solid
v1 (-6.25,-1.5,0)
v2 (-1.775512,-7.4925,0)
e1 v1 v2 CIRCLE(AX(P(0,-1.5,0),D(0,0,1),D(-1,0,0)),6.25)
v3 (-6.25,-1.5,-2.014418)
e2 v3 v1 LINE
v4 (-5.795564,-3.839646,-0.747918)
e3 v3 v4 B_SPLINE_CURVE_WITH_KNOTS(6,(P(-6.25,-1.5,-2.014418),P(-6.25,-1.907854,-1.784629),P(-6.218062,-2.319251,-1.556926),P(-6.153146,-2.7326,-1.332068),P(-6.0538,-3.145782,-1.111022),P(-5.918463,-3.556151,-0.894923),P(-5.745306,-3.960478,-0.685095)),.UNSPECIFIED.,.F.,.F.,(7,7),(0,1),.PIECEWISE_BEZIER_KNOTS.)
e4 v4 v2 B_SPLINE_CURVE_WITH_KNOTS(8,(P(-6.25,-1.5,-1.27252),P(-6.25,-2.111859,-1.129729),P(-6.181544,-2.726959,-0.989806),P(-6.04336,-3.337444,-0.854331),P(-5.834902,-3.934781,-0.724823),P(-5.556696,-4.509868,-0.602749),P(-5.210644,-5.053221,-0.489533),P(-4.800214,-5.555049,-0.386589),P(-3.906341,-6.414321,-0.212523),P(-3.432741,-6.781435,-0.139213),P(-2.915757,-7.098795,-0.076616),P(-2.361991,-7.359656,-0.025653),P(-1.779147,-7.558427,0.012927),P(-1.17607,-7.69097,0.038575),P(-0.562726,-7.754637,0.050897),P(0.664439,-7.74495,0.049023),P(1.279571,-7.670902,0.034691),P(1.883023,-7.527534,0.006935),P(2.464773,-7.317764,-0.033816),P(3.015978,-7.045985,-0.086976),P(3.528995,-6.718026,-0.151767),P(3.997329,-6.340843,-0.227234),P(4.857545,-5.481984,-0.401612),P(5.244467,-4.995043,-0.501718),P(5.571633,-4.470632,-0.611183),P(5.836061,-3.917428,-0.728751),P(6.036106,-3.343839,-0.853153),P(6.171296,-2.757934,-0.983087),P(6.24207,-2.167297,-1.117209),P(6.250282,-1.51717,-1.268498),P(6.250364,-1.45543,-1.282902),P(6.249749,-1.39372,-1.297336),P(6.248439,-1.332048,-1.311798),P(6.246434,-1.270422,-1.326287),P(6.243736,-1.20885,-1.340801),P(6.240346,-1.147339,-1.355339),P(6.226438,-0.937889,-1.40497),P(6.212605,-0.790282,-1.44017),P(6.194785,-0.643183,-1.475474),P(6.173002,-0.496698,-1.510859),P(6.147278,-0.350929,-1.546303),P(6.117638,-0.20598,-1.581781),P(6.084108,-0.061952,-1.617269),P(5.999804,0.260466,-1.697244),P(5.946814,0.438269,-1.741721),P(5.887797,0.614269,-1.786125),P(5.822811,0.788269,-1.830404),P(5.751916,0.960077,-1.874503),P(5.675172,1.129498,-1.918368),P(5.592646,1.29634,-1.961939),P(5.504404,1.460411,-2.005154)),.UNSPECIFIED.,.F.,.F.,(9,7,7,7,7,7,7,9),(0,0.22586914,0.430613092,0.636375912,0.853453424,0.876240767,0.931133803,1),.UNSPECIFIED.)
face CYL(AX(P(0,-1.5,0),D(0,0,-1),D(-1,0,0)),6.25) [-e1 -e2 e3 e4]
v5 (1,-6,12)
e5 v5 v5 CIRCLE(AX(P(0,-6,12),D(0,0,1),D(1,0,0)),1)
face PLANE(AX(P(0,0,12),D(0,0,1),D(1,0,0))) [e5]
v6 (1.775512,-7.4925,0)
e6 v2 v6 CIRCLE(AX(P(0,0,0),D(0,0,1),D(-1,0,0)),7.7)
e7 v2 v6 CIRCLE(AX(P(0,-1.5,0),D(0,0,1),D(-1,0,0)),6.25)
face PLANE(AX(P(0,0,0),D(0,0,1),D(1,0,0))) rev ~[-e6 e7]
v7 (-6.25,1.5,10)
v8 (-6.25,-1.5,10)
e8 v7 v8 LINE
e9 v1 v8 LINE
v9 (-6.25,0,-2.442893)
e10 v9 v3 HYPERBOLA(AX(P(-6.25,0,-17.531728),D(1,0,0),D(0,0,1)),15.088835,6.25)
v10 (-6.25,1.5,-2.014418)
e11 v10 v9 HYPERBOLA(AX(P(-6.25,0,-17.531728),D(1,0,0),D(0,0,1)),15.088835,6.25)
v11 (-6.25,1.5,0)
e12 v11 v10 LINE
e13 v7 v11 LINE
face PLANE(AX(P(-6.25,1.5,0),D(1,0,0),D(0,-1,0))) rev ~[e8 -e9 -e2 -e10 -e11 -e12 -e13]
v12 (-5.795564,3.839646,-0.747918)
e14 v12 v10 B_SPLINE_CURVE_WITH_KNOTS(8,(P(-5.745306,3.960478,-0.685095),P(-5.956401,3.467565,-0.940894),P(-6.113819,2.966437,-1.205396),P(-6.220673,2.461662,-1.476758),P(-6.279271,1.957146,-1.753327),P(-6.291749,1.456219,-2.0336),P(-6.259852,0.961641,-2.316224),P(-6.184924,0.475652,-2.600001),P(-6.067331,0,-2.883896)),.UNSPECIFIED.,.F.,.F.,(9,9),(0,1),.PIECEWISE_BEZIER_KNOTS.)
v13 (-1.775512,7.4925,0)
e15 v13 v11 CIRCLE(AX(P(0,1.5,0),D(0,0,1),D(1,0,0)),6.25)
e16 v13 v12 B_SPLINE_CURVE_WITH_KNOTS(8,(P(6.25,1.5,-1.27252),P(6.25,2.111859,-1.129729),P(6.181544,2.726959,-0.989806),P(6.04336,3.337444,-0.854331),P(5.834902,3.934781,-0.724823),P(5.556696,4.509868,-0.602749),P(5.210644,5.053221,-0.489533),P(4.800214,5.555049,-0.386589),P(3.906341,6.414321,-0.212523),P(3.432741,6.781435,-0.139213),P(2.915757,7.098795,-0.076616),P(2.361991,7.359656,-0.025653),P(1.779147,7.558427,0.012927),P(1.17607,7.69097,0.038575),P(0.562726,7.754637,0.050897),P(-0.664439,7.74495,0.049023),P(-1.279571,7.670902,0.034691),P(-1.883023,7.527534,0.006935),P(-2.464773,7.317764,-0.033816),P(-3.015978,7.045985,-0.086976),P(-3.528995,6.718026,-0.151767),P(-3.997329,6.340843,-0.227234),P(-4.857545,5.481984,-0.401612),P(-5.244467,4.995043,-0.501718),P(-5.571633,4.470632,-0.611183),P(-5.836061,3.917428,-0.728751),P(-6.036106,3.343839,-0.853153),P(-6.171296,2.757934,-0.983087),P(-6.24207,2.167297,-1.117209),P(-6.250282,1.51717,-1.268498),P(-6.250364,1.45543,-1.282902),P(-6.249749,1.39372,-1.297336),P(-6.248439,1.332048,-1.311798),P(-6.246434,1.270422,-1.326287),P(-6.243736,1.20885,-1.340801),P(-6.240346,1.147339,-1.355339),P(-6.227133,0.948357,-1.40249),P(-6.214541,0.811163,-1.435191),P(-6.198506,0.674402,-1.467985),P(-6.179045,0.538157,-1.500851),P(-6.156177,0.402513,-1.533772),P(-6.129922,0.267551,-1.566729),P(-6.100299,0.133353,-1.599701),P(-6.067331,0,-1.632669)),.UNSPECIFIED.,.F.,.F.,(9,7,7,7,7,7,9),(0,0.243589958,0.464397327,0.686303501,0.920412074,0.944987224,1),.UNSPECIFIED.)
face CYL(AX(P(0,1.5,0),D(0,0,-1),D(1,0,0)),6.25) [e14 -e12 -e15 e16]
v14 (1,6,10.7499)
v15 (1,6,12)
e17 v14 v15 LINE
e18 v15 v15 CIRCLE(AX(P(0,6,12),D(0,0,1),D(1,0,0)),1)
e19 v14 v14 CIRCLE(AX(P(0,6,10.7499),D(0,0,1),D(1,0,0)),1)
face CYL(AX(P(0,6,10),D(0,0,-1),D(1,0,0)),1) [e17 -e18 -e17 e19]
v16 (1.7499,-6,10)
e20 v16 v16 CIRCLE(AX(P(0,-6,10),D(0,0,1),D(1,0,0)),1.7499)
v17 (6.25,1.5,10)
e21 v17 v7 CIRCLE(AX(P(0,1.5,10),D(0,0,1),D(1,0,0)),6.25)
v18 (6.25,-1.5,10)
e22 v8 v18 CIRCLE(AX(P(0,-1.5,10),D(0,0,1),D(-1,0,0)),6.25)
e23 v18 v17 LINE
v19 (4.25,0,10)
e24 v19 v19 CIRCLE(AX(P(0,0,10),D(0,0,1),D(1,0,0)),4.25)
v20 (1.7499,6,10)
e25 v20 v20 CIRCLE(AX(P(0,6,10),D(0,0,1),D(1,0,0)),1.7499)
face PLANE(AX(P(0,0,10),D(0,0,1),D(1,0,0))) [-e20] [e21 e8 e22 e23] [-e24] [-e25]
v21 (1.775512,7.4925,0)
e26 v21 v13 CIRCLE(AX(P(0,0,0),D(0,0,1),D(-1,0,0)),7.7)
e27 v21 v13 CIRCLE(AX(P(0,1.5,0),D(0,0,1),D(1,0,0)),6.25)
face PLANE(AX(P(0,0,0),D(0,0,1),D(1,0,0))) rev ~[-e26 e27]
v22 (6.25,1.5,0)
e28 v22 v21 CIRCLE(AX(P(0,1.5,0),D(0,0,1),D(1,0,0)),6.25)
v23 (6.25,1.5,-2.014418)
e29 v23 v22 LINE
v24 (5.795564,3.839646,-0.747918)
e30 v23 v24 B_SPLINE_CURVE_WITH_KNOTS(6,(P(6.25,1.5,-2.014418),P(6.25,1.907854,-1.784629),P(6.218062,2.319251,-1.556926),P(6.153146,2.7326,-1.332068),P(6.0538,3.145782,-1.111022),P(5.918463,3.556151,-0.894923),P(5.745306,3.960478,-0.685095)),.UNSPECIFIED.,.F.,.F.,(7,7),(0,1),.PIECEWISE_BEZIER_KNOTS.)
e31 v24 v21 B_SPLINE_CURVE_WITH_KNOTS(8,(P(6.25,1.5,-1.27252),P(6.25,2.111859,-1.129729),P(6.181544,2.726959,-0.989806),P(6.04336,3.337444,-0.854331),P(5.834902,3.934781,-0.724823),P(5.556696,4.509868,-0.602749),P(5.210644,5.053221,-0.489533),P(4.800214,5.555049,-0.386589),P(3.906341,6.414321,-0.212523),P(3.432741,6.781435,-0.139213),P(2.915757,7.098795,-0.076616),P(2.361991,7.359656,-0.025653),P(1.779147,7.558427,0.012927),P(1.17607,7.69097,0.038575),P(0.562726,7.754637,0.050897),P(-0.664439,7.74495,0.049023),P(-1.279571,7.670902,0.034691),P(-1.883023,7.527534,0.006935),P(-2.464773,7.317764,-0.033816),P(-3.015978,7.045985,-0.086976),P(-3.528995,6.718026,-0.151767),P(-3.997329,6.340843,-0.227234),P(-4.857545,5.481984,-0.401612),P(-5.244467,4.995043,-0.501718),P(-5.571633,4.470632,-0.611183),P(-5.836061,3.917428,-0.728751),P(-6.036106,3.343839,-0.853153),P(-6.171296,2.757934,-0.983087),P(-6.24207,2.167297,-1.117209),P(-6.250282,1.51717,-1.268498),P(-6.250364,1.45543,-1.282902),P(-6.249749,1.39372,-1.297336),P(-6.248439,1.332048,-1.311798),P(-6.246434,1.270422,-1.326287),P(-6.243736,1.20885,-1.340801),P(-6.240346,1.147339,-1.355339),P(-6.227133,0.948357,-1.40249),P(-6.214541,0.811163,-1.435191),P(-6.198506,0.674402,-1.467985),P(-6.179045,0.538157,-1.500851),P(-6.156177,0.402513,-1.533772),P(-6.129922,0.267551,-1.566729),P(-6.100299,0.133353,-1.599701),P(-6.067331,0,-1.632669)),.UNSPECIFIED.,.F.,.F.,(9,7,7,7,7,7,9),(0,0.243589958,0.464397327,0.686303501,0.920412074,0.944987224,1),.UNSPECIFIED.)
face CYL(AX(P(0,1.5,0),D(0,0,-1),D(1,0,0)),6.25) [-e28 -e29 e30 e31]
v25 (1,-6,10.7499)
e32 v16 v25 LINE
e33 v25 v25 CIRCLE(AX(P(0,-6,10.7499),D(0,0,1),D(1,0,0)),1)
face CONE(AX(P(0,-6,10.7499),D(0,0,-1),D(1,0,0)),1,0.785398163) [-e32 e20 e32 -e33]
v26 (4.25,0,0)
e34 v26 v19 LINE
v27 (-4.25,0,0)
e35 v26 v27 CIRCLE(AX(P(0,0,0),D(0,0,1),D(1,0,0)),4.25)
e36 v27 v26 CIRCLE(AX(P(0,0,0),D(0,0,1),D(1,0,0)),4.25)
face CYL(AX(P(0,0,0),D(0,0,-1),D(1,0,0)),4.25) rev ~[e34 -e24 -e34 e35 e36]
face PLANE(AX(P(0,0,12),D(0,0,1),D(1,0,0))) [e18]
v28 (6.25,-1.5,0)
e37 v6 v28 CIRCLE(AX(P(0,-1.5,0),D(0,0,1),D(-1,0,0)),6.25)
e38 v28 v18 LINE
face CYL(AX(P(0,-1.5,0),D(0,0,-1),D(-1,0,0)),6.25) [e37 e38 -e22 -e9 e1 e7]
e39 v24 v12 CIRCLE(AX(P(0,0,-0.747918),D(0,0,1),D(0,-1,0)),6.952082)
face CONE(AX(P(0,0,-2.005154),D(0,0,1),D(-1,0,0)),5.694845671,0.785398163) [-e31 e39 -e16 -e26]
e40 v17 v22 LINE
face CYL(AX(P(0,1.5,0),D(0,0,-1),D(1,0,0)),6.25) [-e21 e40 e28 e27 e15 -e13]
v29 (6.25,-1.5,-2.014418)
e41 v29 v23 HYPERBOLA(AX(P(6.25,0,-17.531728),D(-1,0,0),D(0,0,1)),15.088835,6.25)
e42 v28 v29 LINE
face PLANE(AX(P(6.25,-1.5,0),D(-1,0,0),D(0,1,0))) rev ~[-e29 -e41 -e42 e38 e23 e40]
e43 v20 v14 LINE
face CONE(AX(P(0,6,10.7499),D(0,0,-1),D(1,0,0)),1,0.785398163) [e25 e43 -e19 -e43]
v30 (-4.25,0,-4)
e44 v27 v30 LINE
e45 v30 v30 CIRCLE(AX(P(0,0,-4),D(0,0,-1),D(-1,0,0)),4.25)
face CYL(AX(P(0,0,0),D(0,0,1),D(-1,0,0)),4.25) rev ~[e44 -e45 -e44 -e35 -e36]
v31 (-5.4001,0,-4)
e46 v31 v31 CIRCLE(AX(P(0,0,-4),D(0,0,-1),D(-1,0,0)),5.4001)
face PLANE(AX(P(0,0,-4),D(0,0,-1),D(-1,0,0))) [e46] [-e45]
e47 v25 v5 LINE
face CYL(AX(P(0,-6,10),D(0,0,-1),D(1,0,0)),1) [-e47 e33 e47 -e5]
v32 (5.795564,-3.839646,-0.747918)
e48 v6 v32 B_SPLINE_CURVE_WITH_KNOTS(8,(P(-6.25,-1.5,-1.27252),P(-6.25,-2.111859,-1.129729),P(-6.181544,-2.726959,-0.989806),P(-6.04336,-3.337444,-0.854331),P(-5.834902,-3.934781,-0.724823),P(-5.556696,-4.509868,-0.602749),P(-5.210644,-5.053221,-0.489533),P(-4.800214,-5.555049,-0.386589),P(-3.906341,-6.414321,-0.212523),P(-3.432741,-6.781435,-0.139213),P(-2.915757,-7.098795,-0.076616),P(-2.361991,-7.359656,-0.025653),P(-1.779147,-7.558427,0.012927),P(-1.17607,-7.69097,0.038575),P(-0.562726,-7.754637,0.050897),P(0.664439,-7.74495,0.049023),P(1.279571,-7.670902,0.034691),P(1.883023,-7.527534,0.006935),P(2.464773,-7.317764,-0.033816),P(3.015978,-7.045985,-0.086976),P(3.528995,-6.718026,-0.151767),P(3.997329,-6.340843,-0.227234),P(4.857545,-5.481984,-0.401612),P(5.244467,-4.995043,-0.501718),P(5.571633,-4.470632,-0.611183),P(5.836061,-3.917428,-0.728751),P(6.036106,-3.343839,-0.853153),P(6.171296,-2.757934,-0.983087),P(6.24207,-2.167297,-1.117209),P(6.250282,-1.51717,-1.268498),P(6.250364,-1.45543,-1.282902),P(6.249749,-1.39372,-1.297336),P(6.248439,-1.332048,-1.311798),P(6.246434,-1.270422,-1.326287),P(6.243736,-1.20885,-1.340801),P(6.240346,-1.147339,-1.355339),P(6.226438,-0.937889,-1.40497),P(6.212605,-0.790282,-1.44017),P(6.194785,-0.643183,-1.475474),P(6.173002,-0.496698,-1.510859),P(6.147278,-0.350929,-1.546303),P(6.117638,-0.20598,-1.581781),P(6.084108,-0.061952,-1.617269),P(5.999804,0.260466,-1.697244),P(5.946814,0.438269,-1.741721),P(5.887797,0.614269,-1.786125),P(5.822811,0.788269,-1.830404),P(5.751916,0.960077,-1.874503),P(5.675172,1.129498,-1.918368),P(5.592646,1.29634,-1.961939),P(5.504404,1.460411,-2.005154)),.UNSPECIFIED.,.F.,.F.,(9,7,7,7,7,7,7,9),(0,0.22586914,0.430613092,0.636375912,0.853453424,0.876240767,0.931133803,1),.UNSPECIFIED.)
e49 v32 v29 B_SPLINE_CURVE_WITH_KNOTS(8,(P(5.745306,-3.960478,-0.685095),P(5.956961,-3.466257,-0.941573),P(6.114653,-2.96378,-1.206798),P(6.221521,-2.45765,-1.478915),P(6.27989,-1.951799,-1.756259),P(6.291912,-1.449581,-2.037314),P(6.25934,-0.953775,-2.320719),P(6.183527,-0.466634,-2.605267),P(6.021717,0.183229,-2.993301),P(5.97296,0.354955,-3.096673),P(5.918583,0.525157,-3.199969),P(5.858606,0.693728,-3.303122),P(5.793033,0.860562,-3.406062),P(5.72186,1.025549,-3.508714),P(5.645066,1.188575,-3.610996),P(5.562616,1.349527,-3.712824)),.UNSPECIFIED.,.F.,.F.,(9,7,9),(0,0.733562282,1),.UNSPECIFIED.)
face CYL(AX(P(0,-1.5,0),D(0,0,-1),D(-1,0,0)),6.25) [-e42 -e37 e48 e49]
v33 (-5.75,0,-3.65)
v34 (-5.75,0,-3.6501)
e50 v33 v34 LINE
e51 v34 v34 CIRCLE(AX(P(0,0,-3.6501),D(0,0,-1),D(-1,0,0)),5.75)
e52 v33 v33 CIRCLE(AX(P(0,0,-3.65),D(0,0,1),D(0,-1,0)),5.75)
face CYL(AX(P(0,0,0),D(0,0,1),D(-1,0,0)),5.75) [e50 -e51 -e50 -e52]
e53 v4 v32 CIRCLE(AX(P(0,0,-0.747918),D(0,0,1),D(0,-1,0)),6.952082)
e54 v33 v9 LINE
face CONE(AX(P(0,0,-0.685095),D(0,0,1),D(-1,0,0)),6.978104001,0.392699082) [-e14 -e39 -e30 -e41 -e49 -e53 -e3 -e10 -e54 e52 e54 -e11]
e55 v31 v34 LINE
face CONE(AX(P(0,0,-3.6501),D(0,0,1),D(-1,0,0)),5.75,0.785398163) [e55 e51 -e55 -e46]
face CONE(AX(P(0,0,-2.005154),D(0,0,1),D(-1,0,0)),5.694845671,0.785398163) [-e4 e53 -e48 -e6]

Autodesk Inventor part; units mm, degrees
ref_plane "YZ Plane" through (0, 0, 0) normal (1, 0, 0) x (0, 1, 0)
ref_plane "XZ Plane" through (0, 0, 0) normal (0, 1, 0) x (-1, 0, 0)
ref_plane "XY Plane" through (0, 0, 0) normal (0, 0, 1) x (1, 0, 0)
sketch "Sketch1" plane through (0, 0, 0) normal (0, 0, 1) x (1, 0, 0)
  circle A0 centre (0, 0) radius 4.25
  line L0 (0, -1.5) -> (0, 1.5) construction
  line L1 (6.25, -1.5) -> (6.25, 1.5)
  line L2 (-6.25, 1.5) -> (-6.25, -1.5)
  arc A1 (-6.25, -1.5) -> (6.25, -1.5) centre (0, -1.5) ccw
  arc A2 (6.25, 1.5) -> (-6.25, 1.5) centre (0, 1.5) ccw
  dimension "d0" = 8.5
  dimension "d1" = 12.5
  dimension "d2" = 3
extrude "Extrusion1" add sketch "Sketch1" along normal blind 10
sketch "Sketch2" plane through (0, 0, 10) normal (0, 0, 1) x (1, 0, 0)
  circle A0 centre (0, 0) radius 4.25 projected
  line L0 (6.25, -1.5) -> (6.25, 1.5) projected
  line L1 (-6.25, 1.5) -> (-6.25, -1.5) projected
  circle A1 centre (0, 6) radius 1
  circle A2 centre (0, -6) radius 1
  line L2 (0, 6) -> (0, 0) construction
  line L3 (0, 0) -> (0, -6) construction
  dimension "d5" = 2
  dimension "d6" = 6
extrude "Extrusion2" add sketch "Sketch2" along normal blind 2 contours A1 | A2
sketch "Sketch3" plane through (0, 0, 0) normal (0, 0, -1) x (-1, 0, 0)
  circle A0 centre (0, 0) radius 4.25 projected
  circle A1 centre (0, 0) radius 4.25
  circle A2 centre (0, 0) radius 5.75
  dimension "d9" = 1.5
extrude "Extrusion3" add sketch "Sketch3" along normal blind 4
chamfer "Chamfer1" distance 1.95 angle 45 1 edges at (5.75, 0, 0)
chamfer "Chamfer2" distance 1.7 angle 45 1 edges at (5.75, 0, -1.95)
chamfer "Chamfer3" distance 0.35 angle 45 1 edges at (5.75, 0, -4)
chamfer "Chamfer4" distance 0.75 angle 45 2 edges at (-1, -6, 10) (-1, 6, 10)
properties part number "collar"
